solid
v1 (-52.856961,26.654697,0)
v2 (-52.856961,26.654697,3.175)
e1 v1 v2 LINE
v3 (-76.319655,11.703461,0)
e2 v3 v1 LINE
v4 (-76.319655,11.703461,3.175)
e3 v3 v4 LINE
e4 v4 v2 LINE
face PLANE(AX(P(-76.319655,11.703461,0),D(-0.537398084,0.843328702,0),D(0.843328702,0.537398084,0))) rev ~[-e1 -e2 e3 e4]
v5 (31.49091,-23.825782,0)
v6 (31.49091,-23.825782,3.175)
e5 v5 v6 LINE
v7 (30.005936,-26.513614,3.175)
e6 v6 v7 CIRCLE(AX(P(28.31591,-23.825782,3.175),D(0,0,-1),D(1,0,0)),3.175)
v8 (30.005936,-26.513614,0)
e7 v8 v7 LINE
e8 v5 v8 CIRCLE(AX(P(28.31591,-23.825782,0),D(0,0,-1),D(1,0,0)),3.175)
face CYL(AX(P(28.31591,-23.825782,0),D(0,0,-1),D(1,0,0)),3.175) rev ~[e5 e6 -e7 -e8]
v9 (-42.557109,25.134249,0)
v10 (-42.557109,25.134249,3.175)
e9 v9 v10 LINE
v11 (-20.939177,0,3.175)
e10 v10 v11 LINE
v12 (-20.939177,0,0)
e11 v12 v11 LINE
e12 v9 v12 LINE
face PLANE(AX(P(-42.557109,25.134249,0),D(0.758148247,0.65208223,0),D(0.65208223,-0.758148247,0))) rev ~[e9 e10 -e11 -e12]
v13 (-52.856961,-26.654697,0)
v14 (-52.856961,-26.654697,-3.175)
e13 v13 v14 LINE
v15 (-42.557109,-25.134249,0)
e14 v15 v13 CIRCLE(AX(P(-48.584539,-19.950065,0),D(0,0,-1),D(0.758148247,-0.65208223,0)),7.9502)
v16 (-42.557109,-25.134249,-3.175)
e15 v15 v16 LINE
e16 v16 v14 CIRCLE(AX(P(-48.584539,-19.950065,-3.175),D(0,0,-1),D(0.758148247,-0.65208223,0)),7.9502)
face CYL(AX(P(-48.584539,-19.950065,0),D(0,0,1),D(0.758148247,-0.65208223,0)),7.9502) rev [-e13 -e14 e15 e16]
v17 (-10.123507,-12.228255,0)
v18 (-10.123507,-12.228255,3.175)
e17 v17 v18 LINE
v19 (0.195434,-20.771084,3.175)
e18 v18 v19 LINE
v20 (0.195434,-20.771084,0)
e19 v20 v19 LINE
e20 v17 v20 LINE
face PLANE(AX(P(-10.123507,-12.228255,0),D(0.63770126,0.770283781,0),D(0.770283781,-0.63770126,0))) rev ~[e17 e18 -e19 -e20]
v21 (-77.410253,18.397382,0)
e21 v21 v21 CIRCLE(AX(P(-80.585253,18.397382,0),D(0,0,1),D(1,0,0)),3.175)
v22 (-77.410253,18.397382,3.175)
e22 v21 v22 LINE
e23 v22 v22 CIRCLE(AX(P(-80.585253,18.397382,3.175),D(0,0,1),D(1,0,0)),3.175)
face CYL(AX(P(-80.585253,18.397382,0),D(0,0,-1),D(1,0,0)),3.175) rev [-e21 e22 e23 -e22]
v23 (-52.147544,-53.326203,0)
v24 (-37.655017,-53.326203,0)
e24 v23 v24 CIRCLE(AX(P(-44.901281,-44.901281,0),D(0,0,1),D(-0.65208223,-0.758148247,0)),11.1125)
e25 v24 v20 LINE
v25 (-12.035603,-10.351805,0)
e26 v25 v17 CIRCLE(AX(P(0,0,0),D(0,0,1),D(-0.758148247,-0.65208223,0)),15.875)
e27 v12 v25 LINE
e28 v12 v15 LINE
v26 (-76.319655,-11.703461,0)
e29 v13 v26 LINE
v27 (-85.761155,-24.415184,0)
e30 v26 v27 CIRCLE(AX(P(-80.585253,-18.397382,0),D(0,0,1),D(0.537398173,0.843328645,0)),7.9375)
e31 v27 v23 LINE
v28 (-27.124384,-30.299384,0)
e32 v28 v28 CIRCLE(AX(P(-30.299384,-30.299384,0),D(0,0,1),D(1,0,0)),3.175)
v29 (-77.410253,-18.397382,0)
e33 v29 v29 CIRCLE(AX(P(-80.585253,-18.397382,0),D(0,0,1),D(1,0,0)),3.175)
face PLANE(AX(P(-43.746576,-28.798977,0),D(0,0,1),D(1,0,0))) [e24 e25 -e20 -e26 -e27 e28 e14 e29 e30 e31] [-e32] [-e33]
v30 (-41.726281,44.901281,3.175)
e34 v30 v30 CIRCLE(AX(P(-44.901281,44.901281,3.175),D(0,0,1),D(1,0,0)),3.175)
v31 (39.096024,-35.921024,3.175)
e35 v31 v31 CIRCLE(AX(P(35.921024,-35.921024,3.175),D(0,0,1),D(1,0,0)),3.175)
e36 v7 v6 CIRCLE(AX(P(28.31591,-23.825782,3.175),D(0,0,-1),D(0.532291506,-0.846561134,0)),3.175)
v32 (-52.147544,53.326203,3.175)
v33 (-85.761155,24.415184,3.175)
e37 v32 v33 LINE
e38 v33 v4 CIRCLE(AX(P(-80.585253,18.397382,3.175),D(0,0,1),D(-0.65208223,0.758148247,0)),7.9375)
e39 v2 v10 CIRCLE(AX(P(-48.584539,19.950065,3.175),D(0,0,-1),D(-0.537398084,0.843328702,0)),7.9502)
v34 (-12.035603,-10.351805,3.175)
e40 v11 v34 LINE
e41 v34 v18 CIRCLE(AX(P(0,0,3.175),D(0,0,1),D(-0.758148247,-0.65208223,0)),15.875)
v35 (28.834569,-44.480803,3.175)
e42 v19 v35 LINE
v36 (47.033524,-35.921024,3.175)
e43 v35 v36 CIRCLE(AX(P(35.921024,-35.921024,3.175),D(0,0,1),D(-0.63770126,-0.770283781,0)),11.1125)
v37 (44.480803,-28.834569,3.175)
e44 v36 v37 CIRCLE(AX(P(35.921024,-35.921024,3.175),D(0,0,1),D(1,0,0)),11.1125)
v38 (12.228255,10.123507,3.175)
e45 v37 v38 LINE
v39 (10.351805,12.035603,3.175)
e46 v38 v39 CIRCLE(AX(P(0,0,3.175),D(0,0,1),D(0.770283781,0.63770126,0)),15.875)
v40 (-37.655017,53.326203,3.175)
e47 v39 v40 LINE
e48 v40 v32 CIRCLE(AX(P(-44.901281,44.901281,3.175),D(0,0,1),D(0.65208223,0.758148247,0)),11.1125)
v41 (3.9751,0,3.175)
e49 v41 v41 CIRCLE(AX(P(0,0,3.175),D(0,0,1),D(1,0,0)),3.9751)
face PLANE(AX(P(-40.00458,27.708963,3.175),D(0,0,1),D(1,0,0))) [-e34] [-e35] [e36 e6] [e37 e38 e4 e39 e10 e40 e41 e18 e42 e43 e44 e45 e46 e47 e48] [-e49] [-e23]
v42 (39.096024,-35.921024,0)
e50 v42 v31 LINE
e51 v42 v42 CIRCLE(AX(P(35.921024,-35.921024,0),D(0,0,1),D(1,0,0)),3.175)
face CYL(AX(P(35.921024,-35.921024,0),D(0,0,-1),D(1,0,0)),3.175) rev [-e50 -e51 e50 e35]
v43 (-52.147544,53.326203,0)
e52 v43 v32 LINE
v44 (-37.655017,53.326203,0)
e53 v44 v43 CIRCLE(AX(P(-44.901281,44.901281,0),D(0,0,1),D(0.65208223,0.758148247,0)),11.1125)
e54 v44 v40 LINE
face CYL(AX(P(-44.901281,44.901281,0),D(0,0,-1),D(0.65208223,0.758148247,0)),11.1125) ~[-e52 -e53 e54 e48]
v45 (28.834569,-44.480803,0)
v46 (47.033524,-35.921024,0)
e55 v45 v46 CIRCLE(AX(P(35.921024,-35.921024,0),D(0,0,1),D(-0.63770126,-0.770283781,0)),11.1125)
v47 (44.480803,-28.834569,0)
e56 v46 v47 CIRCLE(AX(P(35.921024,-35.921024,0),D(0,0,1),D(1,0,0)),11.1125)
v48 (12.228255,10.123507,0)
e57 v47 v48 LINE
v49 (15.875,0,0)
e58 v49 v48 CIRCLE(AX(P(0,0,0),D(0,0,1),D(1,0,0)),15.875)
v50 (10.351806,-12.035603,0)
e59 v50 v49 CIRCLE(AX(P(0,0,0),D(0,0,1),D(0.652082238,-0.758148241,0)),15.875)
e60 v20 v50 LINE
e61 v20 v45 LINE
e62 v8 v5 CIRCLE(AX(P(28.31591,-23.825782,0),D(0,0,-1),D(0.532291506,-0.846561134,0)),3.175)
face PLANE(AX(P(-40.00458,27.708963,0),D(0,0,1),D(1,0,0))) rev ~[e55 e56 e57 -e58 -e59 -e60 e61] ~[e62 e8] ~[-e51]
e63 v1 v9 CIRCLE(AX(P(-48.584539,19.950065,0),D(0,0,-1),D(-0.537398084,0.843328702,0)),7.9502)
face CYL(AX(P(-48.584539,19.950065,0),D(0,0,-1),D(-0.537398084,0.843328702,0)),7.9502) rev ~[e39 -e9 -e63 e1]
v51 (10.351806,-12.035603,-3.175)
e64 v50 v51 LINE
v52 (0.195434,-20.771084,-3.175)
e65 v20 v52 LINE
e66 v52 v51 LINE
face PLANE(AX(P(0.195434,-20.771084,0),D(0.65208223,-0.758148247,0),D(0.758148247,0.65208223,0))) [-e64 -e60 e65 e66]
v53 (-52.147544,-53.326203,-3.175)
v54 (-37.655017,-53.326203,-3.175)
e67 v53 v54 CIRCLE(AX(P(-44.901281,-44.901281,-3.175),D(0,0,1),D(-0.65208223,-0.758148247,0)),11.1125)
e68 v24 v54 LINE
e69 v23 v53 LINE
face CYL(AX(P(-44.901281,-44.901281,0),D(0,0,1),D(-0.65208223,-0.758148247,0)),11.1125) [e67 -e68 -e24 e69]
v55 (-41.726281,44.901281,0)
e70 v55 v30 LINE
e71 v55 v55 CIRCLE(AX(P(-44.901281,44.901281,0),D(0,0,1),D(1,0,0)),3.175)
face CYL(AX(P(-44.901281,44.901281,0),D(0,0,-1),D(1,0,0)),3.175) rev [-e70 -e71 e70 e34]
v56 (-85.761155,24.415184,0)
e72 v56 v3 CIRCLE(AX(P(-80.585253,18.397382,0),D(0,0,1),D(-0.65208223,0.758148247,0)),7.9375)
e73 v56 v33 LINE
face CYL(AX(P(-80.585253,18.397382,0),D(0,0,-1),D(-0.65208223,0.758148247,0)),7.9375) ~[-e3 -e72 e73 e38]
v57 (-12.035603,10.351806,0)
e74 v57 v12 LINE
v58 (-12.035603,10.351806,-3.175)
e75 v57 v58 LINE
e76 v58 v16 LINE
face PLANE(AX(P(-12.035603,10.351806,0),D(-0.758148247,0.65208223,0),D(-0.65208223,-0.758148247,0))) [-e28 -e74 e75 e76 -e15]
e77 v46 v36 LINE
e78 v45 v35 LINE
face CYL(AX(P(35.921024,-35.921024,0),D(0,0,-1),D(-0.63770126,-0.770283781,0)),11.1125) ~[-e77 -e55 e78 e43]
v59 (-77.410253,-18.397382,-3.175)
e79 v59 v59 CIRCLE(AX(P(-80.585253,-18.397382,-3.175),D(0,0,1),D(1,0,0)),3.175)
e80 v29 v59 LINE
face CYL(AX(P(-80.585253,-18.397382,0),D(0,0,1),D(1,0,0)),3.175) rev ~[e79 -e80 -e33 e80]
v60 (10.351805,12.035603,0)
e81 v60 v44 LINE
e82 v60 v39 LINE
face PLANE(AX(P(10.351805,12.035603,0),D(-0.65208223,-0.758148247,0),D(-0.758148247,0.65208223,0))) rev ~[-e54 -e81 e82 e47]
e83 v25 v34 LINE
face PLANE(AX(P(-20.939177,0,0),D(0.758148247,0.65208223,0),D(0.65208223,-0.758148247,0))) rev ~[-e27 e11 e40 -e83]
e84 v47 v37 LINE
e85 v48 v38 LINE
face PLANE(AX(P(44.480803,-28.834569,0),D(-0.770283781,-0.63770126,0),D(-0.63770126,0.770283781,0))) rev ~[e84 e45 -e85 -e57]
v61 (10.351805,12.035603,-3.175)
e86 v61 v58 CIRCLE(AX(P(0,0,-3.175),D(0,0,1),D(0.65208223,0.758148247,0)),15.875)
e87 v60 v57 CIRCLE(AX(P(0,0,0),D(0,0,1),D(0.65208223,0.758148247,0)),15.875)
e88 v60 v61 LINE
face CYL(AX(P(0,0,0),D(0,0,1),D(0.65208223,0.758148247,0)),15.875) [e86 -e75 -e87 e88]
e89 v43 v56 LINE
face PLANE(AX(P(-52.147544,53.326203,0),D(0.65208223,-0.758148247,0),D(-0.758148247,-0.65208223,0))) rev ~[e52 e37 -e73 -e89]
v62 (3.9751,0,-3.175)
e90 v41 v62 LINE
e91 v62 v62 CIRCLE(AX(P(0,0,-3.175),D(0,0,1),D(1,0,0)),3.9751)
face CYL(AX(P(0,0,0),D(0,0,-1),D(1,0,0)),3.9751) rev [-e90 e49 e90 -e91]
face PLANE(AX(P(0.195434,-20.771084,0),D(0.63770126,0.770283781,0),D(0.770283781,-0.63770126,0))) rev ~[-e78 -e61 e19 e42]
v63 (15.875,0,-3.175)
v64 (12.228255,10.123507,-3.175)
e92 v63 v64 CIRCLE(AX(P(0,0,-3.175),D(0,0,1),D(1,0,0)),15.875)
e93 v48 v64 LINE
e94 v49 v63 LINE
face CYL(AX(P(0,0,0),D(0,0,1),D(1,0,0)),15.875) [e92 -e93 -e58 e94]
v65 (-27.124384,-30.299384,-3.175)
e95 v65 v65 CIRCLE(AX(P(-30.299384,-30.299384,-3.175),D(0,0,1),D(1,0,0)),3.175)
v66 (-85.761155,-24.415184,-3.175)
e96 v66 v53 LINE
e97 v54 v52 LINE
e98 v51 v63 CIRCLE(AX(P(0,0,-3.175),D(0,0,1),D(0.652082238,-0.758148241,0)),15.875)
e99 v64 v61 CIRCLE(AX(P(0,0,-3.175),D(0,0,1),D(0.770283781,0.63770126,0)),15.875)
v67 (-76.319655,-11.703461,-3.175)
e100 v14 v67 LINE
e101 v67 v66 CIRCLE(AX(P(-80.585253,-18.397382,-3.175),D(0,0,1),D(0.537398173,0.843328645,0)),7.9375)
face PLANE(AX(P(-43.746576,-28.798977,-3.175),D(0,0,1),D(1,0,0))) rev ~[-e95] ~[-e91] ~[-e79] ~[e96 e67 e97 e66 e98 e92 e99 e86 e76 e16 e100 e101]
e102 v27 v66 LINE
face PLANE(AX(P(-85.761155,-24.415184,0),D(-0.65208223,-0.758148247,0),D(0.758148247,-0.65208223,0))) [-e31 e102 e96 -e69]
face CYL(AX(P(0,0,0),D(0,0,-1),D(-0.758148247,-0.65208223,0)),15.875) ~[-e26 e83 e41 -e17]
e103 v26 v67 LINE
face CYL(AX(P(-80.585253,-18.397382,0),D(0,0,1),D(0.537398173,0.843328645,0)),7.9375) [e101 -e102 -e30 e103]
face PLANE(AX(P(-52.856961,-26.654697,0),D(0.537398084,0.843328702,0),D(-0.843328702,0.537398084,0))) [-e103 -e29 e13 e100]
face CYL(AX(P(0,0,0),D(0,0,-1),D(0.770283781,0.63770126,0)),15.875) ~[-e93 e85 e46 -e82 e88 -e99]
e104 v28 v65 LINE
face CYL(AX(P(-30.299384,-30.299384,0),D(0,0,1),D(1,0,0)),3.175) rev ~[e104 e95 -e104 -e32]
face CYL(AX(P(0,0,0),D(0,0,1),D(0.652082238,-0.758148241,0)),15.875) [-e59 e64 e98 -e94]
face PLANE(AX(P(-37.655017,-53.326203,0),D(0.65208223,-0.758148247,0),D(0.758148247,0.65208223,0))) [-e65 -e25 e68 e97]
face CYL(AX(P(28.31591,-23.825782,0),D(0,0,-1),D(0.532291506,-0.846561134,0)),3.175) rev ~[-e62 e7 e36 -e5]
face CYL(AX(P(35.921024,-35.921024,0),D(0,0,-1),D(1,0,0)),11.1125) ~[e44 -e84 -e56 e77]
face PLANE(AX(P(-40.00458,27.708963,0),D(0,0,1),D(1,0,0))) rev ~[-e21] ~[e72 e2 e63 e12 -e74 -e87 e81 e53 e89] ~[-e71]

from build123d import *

# Parameters (mm, degrees)
F0_R     = 3.175
F0_R_2   = 3.9751
F1_DEPTH = 3.175
F2_DEPTH = 3.175


# Not quite as in the source:
# - after a boolean that leaves OpenCascade's solid faulty, fix() repairs it


with BuildPart() as f1:
    # F0 (on Top) → F1 (new body)
    with BuildSketch(Plane.XY):
        with BuildLine():
            Line((0.1954344954, -20.7710836138), (-10.1235074968, -12.2282550252))
            ThreePointArc((-10.1235074968, -12.2282550252), (-11.1192092809, -11.3304373246), (-12.0356034274, -10.3518054047))
            Line((-12.0356034274, -10.3518054047), (-20.9391765456, 0))
            Line((-20.9391765456, 0), (-42.5571087943, -25.134249466))
            ThreePointArc((-42.5571087943, -25.134249466), (-47.4235249822, -27.815033629), (-52.8569612369, -26.6546971654))
            Line((-52.8569612369, -26.6546971654), (-76.3196547531, -11.7034610596))
            ThreePointArc((-76.3196547531, -11.7034610596), (-73.6260110422, -14.5799404883), (-72.6477527528, -18.3973821792))
            ThreePointArc((-72.6477527528, -18.3973821792), (-77.2746501981, -25.611522251), (-85.7611554551, -24.4151838929))
            Line((-85.7611554551, -24.4151838929), (-52.1475443887, -53.3262030046))
            ThreePointArc((-52.1475443887, -53.3262030046), (-49.5361241819, -34.8014845049), (-33.7887806053, -44.9012806053))
            ThreePointArc((-33.7887806053, -44.9012806053), (-34.8014845049, -49.5361241819), (-37.655016822, -53.3262030046))
            Line((-37.655016822, -53.3262030046), (0.1954344954, -20.7710836138))
        make_face()
        with Locations((-30.2993841525, -30.2993841525)):
            Circle(F0_R, mode=Mode.SUBTRACT)
        with BuildLine():
            ThreePointArc((-52.1475443887, -53.3262030046), (-44.9012806053, -56.0137806053), (-37.655016822, -53.3262030046))
            ThreePointArc((-37.655016822, -53.3262030046), (-34.8014845049, -49.5361241819), (-33.7887806053, -44.9012806053))
            ThreePointArc((-33.7887806053, -44.9012806053), (-49.5361241819, -34.8014845049), (-52.1475443887, -53.3262030046))
        make_face()
        with BuildLine():
            ThreePointArc((-76.3196547531, -11.7034610596), (-86.9573903855, -13.664542837), (-85.7611554551, -24.4151838929))
            ThreePointArc((-85.7611554551, -24.4151838929), (-77.2746501981, -25.611522251), (-72.6477527528, -18.3973821792))
            ThreePointArc((-72.6477527528, -18.3973821792), (-73.6260110422, -14.5799404883), (-76.3196547531, -11.7034610596))
        make_face()
        with Locations((-80.5852527528, -18.3973821792)):
            Circle(F0_R, mode=Mode.SUBTRACT)
        with BuildLine():
            Line((0.1954344954, -20.7710836138), (10.3518055249, -12.0356033241))
            ThreePointArc((10.3518055249, -12.0356033241), (0.1493608613, -15.8742973493), (-10.1235074968, -12.2282550252))
            Line((-10.1235074968, -12.2282550252), (0.1954344954, -20.7710836138))
        make_face()
        with BuildLine():
            ThreePointArc((-12.0356034274, -10.3518054047), (-15.875, 6.76e-08), (-12.0356033393, 10.3518055072))
            Line((-12.0356033393, 10.3518055072), (-20.9391765456, 0))
            Line((-20.9391765456, 0), (-12.0356034274, -10.3518054047))
        make_face()
        with BuildLine():
            ThreePointArc((10.3518055249, -12.0356033241), (14.4282801766, -6.6212050373), (15.875, 0))
            ThreePointArc((15.875, 0), (14.9355142785, 5.3801522504), (12.2282550252, 10.1235074968))
            ThreePointArc((12.2282550252, 10.1235074968), (11.3304373246, 11.1192092809), (10.3518054047, 12.0356034274))
            ThreePointArc((10.3518054047, 12.0356034274), (-1.1906249326, 15.8302886035), (-12.0356033393, 10.3518055072))
            ThreePointArc((-12.0356033393, 10.3518055072), (-15.875, 6.76e-08), (-12.0356034274, -10.3518054047))
            ThreePointArc((-12.0356034274, -10.3518054047), (-11.1192092809, -11.3304373246), (-10.1235074968, -12.2282550252))
            ThreePointArc((-10.1235074968, -12.2282550252), (0.1493608613, -15.8742973493), (10.3518055249, -12.0356033241))
        make_face()
        Circle(F0_R_2, mode=Mode.SUBTRACT)
    extrude(amount=-F1_DEPTH)

    # F0 (on Top) → F2 (join)
    with BuildSketch(Plane.XY):
        with BuildLine():
            ThreePointArc((-12.0356033393, 10.3518055072), (-1.1906249326, 15.8302886035), (10.3518054047, 12.0356034274))
            Line((10.3518054047, 12.0356034274), (-37.655016822, 53.3262030046))
            ThreePointArc((-37.655016822, 53.3262030046), (-34.8014845049, 49.5361241819), (-33.7887806053, 44.9012806053))
            ThreePointArc((-33.7887806053, 44.9012806053), (-49.5361241819, 34.8014845049), (-52.1475443887, 53.3262030046))
            Line((-52.1475443887, 53.3262030046), (-85.7611554551, 24.4151838929))
            ThreePointArc((-85.7611554551, 24.4151838929), (-77.2746501981, 25.611522251), (-72.6477527528, 18.3973821792))
            ThreePointArc((-72.6477527528, 18.3973821792), (-73.6260112444, 14.5799401196), (-76.3196554623, 11.7034606077))
            Line((-76.3196554623, 11.7034606077), (-52.8569612369, 26.6546971654))
            ThreePointArc((-52.8569612369, 26.6546971654), (-47.4235249822, 27.815033629), (-42.5571087943, 25.134249466))
            Line((-42.5571087943, 25.134249466), (-20.9391765456, 0))
            Line((-20.9391765456, 0), (-12.0356033393, 10.3518055072))
        make_face()
        with BuildLine():
            ThreePointArc((-72.6477527528, 18.3973821792), (-77.2746501981, 25.611522251), (-85.7611554551, 24.4151838929))
            ThreePointArc((-85.7611554551, 24.4151838929), (-86.9573906362, 13.6645431745), (-76.3196554623, 11.7034606077))
            ThreePointArc((-76.3196554623, 11.7034606077), (-73.6260112444, 14.5799401196), (-72.6477527528, 18.3973821792))
        make_face()
        with Locations((-80.5852527528, 18.3973821792)):
            Circle(F0_R, mode=Mode.SUBTRACT)
        with BuildLine():
            ThreePointArc((-33.7887806053, 44.9012806053), (-34.8014845049, 49.5361241819), (-37.655016822, 53.3262030046))
            ThreePointArc((-37.655016822, 53.3262030046), (-44.9012806053, 56.0137806053), (-52.1475443887, 53.3262030046))
            ThreePointArc((-52.1475443887, 53.3262030046), (-49.5361241819, 34.8014845049), (-33.7887806053, 44.9012806053))
        make_face()
        with Locations((-44.9012806053, 44.9012806053)):
            Circle(F0_R, mode=Mode.SUBTRACT)
        with BuildLine():
            ThreePointArc((10.3518055249, -12.0356033241), (14.4282801766, -6.6212050373), (15.875, 0))
            ThreePointArc((15.875, 0), (14.9355142785, 5.3801522504), (12.2282550252, 10.1235074968))
            ThreePointArc((12.2282550252, 10.1235074968), (11.3304373246, 11.1192092809), (10.3518054047, 12.0356034274))
            ThreePointArc((10.3518054047, 12.0356034274), (-1.1906249326, 15.8302886035), (-12.0356033393, 10.3518055072))
            ThreePointArc((-12.0356033393, 10.3518055072), (-15.875, 6.76e-08), (-12.0356034274, -10.3518054047))
            ThreePointArc((-12.0356034274, -10.3518054047), (-11.1192092809, -11.3304373246), (-10.1235074968, -12.2282550252))
            ThreePointArc((-10.1235074968, -12.2282550252), (0.1493608613, -15.8742973493), (10.3518055249, -12.0356033241))
        make_face()
        Circle(F0_R_2, mode=Mode.SUBTRACT)
        with BuildLine():
            ThreePointArc((-12.0356034274, -10.3518054047), (-15.875, 6.76e-08), (-12.0356033393, 10.3518055072))
            Line((-12.0356033393, 10.3518055072), (-20.9391765456, 0))
            Line((-20.9391765456, 0), (-12.0356034274, -10.3518054047))
        make_face()
        with BuildLine():
            Line((0.1954344954, -20.7710836138), (10.3518055249, -12.0356033241))
            ThreePointArc((10.3518055249, -12.0356033241), (0.1493608613, -15.8742973493), (-10.1235074968, -12.2282550252))
            Line((-10.1235074968, -12.2282550252), (0.1954344954, -20.7710836138))
        make_face()
        with BuildLine():
            ThreePointArc((12.2282550252, 10.1235074968), (14.9355142785, 5.3801522504), (15.875, 0))
            ThreePointArc((15.875, 0), (14.4282801766, -6.6212050373), (10.3518055249, -12.0356033241))
            Line((10.3518055249, -12.0356033241), (0.1954344954, -20.7710836138))
            Line((0.1954344954, -20.7710836138), (28.8345692365, -44.4808030019))
            ThreePointArc((28.8345692365, -44.4808030019), (24.8320655021, -35.1980826181), (30.0059355892, -26.5136135964))
            ThreePointArc((30.0059355892, -26.5136135964), (37.6803722933, -24.9486796329), (44.4808030542, -28.8345692997))
            Line((44.4808030542, -28.8345692997), (12.2282550252, 10.1235074968))
        make_face()
        with BuildLine():
            ThreePointArc((31.490910058, -23.8257819975), (31.094979692, -25.361163699), (30.0059355892, -26.5136135964))
            ThreePointArc((30.0059355892, -26.5136135964), (25.536840424, -22.290400296), (31.490910058, -23.8257819975))
        make_face(mode=Mode.SUBTRACT)
        with BuildLine():
            ThreePointArc((47.0335244843, -35.9210244843), (46.3758844931, -32.1549179476), (44.4808030542, -28.8345692997))
            ThreePointArc((44.4808030542, -28.8345692997), (37.6803722933, -24.9486796329), (30.0059355892, -26.5136135964))
            ThreePointArc((30.0059355892, -26.5136135964), (24.8320655021, -35.1980826181), (28.8345692365, -44.4808030019))
            ThreePointArc((28.8345692365, -44.4808030019), (40.650687385, -45.9767663811), (47.0335244843, -35.9210244843))
        make_face()
        with Locations((35.9210244843, -35.9210244843)):
            Circle(F0_R, mode=Mode.SUBTRACT)
    extrude(amount=F2_DEPTH)

    add(f1.part.fix(), mode=Mode.REPLACE)


solid = f1.part
